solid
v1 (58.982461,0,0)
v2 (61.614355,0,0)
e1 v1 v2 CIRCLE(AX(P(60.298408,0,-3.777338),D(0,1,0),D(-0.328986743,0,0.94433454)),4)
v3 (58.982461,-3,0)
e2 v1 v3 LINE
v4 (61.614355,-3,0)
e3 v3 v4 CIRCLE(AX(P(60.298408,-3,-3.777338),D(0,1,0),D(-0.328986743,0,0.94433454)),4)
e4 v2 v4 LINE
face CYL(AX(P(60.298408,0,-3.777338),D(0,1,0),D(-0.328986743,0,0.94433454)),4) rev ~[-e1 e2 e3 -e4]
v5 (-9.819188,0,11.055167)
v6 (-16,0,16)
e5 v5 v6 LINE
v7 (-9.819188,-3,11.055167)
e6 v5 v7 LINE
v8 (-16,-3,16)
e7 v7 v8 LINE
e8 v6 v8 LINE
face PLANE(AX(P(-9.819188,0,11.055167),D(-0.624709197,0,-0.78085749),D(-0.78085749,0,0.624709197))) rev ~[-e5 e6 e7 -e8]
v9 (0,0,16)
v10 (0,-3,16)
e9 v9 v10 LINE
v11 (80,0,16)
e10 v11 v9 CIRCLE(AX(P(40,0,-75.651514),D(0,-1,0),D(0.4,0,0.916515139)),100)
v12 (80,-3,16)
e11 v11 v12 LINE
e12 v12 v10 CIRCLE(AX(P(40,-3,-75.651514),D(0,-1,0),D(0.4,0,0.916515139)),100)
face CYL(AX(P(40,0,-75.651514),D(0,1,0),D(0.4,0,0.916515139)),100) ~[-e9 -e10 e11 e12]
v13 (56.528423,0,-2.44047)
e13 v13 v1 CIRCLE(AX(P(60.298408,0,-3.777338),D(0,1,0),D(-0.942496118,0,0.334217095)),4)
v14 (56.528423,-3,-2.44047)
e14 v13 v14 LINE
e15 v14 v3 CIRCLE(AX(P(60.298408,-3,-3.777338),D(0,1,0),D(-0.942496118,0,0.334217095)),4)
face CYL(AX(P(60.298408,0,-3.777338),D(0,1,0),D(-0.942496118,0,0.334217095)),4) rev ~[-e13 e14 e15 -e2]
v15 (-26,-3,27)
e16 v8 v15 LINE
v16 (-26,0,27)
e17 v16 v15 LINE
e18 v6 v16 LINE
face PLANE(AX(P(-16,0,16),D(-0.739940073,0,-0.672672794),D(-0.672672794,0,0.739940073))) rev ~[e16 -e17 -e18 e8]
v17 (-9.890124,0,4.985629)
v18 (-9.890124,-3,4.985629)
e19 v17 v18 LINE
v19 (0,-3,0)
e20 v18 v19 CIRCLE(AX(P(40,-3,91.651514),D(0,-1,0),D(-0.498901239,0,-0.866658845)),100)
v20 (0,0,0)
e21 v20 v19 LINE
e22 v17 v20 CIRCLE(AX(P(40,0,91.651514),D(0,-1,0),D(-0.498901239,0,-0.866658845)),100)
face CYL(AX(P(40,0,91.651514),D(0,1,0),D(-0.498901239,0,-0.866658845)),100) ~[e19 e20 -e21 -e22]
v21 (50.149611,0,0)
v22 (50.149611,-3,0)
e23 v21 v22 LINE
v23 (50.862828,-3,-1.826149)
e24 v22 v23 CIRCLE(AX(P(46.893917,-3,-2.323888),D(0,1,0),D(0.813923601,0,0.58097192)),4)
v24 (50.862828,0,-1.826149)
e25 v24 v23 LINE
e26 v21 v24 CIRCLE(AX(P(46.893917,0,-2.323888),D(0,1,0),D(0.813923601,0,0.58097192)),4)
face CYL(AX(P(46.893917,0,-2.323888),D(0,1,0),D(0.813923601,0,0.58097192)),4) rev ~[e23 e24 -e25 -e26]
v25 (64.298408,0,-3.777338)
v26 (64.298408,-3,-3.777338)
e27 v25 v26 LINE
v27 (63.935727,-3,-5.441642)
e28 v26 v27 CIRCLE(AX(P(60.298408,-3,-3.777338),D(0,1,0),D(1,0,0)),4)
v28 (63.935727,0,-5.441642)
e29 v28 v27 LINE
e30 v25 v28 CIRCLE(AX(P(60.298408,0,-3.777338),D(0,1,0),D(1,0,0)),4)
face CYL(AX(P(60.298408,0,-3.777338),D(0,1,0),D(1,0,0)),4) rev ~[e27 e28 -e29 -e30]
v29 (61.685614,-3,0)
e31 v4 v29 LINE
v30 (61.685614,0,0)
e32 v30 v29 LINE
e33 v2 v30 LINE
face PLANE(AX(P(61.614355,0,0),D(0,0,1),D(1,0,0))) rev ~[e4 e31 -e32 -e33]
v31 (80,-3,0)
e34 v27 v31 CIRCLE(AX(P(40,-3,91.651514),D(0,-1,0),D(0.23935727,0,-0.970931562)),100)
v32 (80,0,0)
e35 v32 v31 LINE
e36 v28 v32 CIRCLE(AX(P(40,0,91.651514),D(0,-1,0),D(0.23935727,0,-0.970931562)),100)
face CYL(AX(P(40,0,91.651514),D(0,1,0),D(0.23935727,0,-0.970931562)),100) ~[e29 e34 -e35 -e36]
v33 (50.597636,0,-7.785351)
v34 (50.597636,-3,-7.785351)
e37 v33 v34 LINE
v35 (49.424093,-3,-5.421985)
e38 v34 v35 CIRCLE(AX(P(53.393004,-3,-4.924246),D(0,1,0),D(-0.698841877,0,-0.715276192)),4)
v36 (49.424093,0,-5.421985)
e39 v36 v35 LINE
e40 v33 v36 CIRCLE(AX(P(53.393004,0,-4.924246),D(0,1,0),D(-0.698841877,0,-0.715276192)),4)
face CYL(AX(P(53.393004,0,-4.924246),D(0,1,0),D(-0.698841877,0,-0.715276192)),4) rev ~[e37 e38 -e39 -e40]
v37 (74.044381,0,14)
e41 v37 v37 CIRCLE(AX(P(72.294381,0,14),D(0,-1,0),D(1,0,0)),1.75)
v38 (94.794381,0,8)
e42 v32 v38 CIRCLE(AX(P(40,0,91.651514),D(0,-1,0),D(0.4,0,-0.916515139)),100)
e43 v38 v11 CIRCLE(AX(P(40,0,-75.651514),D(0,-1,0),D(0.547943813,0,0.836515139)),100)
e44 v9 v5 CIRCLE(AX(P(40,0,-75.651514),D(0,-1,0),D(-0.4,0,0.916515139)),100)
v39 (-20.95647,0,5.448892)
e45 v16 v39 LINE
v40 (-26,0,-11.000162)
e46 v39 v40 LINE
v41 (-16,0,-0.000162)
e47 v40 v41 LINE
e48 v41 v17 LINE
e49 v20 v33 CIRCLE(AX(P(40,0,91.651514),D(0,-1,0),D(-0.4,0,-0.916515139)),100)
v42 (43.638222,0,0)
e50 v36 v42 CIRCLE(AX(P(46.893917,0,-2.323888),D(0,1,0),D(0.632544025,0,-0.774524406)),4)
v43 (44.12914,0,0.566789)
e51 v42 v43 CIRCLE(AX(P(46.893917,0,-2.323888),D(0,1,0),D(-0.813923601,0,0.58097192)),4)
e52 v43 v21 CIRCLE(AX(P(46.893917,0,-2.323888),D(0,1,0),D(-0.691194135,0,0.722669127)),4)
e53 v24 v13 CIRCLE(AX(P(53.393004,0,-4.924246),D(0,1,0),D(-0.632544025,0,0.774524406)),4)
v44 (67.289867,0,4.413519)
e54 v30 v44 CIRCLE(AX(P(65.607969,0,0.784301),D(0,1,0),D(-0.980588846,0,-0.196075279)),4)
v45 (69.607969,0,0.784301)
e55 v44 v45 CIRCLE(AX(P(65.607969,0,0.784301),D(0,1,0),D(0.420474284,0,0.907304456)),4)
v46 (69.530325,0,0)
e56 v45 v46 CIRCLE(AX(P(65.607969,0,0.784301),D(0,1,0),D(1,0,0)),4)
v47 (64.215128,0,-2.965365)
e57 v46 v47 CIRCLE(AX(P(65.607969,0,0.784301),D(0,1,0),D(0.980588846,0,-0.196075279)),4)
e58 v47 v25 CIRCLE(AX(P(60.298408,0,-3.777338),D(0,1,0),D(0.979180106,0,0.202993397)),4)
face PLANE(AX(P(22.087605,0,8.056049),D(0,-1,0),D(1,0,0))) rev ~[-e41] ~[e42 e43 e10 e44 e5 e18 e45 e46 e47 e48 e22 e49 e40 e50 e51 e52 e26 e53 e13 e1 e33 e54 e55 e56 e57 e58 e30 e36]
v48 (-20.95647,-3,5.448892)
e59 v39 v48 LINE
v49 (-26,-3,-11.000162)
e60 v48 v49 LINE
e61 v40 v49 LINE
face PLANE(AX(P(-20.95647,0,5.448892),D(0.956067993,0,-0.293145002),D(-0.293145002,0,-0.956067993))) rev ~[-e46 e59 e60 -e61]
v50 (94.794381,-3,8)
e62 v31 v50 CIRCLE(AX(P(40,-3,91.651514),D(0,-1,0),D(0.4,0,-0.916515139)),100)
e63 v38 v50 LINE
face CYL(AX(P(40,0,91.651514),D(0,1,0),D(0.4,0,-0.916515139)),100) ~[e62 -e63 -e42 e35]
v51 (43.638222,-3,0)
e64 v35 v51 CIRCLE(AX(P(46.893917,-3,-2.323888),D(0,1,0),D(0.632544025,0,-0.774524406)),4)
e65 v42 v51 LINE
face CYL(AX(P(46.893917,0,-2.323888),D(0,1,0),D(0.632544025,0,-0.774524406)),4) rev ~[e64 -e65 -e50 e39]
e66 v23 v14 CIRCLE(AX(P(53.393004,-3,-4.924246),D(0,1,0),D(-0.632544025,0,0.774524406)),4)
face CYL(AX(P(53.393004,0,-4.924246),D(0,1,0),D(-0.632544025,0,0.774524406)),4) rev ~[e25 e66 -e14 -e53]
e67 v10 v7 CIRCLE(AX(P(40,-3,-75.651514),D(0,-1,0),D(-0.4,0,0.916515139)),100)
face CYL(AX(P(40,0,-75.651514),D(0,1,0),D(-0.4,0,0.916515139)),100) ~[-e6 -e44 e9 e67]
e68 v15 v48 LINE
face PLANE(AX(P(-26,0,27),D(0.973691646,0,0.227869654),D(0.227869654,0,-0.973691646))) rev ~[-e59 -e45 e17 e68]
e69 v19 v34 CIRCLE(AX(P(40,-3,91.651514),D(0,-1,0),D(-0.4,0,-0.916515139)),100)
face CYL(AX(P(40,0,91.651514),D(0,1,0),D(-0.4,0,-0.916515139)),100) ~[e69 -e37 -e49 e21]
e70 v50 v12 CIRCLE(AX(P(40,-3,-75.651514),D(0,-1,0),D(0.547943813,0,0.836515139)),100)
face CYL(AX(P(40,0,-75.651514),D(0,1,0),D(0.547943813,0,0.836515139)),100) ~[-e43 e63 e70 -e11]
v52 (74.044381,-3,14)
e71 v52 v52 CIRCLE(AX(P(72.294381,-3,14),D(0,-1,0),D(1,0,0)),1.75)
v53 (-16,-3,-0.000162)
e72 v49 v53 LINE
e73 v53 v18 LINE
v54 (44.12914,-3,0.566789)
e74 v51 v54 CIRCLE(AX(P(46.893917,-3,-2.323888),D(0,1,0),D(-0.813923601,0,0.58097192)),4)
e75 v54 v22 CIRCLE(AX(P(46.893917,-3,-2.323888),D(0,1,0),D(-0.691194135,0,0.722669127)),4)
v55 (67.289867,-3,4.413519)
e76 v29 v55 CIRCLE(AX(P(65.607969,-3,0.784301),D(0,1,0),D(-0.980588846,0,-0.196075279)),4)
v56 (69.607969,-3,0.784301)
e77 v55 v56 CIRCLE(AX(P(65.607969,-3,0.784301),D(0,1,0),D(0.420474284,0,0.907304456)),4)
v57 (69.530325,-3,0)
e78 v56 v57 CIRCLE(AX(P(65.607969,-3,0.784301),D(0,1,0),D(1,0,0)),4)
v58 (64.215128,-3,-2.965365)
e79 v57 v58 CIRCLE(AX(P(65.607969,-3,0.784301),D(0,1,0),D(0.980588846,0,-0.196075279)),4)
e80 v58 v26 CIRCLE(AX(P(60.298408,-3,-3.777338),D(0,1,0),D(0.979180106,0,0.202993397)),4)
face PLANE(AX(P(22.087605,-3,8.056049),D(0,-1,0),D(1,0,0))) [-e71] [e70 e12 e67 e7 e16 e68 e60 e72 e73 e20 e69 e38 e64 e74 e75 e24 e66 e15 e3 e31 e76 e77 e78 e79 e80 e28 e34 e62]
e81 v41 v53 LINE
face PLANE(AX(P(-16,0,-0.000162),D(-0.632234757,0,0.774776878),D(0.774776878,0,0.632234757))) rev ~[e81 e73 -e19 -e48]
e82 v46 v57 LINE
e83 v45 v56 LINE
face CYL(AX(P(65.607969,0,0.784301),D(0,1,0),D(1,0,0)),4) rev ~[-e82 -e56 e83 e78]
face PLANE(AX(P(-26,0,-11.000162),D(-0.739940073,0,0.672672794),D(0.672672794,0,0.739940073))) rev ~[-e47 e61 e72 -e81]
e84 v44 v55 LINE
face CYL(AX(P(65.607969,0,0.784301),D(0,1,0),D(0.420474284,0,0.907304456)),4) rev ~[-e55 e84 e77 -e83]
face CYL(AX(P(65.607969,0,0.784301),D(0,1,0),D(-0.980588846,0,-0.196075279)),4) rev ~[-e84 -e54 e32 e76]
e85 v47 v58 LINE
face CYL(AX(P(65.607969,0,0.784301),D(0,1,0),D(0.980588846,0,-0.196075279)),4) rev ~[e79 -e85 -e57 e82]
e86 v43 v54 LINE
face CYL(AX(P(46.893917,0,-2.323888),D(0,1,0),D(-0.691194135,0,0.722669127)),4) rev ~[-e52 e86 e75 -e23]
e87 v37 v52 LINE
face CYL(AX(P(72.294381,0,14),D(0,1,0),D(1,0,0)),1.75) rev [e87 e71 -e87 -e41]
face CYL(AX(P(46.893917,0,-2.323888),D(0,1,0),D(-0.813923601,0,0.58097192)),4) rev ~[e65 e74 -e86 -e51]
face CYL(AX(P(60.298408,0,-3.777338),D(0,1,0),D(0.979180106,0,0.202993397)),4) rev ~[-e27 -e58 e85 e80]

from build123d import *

# Parameters (mm, degrees)
F0_R     = 1.75
F1_DEPTH = 3


# Not quite as in the source:
# - a feature names something its author has since deleted; it is built from what else it names


with BuildPart() as f1:
    # F0 (on Front) → F1 (new body)
    with BuildSketch(Plane.XZ):
        with BuildLine():
            Line((0, 16), (0, 0))
            Line((0, 0), (43.6382221521, 0))
            ThreePointArc((43.6382221521, 0), (43.870370626, 0.294923121), (44.1291400161, 0.5667888304))
            ThreePointArc((44.1291400161, 0.5667888304), (41.7991534918, 8.3522131948), (44.5474305371, 16))
            Line((44.5474305371, 16), (0, 16))
        make_face()
        with BuildLine():
            ThreePointArc((-9.8901239272, 4.9856294086), (-5.0141391128, 2.3557845503), (0, 0))
            Line((0, 0), (0, 16))
            ThreePointArc((0, 16), (-4.9775998147, 13.6626256025), (-9.8191881817, 11.0551668638))
            ThreePointArc((-9.8191881817, 11.0551668638), (-12.3290859965, 9.5638999576), (-14.7943813031, 8))
            ThreePointArc((-14.7943813031, 8), (-12.3639476772, 6.4575177277), (-9.8901239272, 4.9856294086))
        make_face()
        with BuildLine():
            Line((43.6382221521, 0), (0, 0))
            ThreePointArc((0, 0), (24.7921839108, -7.1853331257), (50.5976363139, -7.7853510181))
            ThreePointArc((50.5976363139, -7.7853510181), (49.8103733831, -6.7032232406), (49.4240926583, -5.4219853039))
            ThreePointArc((49.4240926583, -5.4219853039), (44.1587611024, -5.2426073702), (43.6382221521, 0))
        make_face()
        with BuildLine():
            ThreePointArc((80, 16), (40, 24.3484861009), (0, 16))
            Line((0, 16), (44.5474305371, 16))
            ThreePointArc((44.5474305371, 16), (54.7943813031, 21), (65.041332069, 16))
            Line((65.041332069, 16), (80, 16))
        make_face()
        with BuildLine():
            Line((-16, -0.0001621457), (-9.8901239272, 4.9856294086))
            ThreePointArc((-9.8901239272, 4.9856294086), (-12.3639476772, 6.4575177277), (-14.7943813031, 8))
            ThreePointArc((-14.7943813031, 8), (-12.3290859965, 9.5638999576), (-9.8191881817, 11.0551668638))
            Line((-9.8191881817, 11.0551668638), (-16, 16))
            Line((-16, 16), (-16, -0.0001621457))
        make_face()
        with BuildLine():
            ThreePointArc((44.5474305371, 16), (41.7991534918, 8.3522131948), (44.1291400161, 0.5667888304))
            ThreePointArc((44.1291400161, 0.5667888304), (47.2688331903, 1.6585032514), (50.1496109619, 0))
            Line((50.1496109619, 0), (58.9824606658, 0))
            ThreePointArc((58.9824606658, 0), (60.2984076368, 0.2226618407), (61.6143546079, 0))
            Line((61.6143546079, 0), (61.6856141113, 0))
            ThreePointArc((61.6856141113, 0), (63.1331562403, 3.9268000172), (67.289866632, 4.41351894))
            ThreePointArc((67.289866632, 4.41351894), (67.6676347628, 6.1891037132), (67.7943813031, 8))
            ThreePointArc((67.7943813031, 8), (67.0868659981, 12.2302269468), (65.041332069, 16))
            Line((65.041332069, 16), (44.5474305371, 16))
        make_face()
        with BuildLine():
            ThreePointArc((65.041332069, 16), (54.7943813031, 21), (44.5474305371, 16))
            Line((44.5474305371, 16), (65.041332069, 16))
        make_face()
        with BuildLine():
            Line((80, 0), (80, 16))
            Line((80, 16), (65.041332069, 16))
            ThreePointArc((65.041332069, 16), (67.0868659981, 12.2302269468), (67.7943813031, 8))
            ThreePointArc((67.7943813031, 8), (67.6676347628, 6.1891037132), (67.289866632, 4.41351894))
            ThreePointArc((67.289866632, 4.41351894), (68.9789922296, 2.9374861341), (69.6079694957, 0.7843011149))
            ThreePointArc((69.6079694957, 0.7843011149), (69.5885110127, 0.3902335683), (69.53032488, 0))
            Line((69.53032488, 0), (80, 0))
        make_face()
        with Locations((72.2943813031, 14)):
            Circle(F0_R, mode=Mode.SUBTRACT)
        with BuildLine():
            ThreePointArc((94.7943813031, 8), (87.5656775591, 12.3115824444), (80, 16))
            Line((80, 16), (80, 0))
            ThreePointArc((80, 0), (87.5656775591, 3.6884175556), (94.7943813031, 8))
        make_face()
        Polygon((-26, -11.0001621457), (-16, -0.0001621457), (-16, 16), (-26, 27), (-20.9564695358, 5.4488921514), align=None)
        with BuildLine():
            Line((58.9824606658, 0), (50.1496109619, 0))
            ThreePointArc((50.1496109619, 0), (50.6198306879, -0.8687025049), (50.862827722, -1.8261486257))
            ThreePointArc((50.862827722, -1.8261486257), (53.8241968939, -0.9475550969), (56.5284231629, -2.4404697788))
            ThreePointArc((56.5284231629, -2.4404697788), (57.4778318355, -0.941081445), (58.9824606658, 0))
        make_face()
        with BuildLine():
            ThreePointArc((63.935726955, -5.4416422713), (72.0834406348, -3.0620164808), (80, 0))
            Line((80, 0), (69.53032488, 0))
            ThreePointArc((69.53032488, 0), (67.5568042663, -2.7088411721), (64.215128062, -2.965364569))
            ThreePointArc((64.215128062, -2.965364569), (64.2775332757, -3.3692215709), (64.2984076368, -3.7773381593))
            ThreePointArc((64.2984076368, -3.7773381593), (64.2066858557, -4.6290196511), (63.935726955, -5.4416422713))
        make_face()
    extrude(amount=F1_DEPTH)


solid = f1.part
